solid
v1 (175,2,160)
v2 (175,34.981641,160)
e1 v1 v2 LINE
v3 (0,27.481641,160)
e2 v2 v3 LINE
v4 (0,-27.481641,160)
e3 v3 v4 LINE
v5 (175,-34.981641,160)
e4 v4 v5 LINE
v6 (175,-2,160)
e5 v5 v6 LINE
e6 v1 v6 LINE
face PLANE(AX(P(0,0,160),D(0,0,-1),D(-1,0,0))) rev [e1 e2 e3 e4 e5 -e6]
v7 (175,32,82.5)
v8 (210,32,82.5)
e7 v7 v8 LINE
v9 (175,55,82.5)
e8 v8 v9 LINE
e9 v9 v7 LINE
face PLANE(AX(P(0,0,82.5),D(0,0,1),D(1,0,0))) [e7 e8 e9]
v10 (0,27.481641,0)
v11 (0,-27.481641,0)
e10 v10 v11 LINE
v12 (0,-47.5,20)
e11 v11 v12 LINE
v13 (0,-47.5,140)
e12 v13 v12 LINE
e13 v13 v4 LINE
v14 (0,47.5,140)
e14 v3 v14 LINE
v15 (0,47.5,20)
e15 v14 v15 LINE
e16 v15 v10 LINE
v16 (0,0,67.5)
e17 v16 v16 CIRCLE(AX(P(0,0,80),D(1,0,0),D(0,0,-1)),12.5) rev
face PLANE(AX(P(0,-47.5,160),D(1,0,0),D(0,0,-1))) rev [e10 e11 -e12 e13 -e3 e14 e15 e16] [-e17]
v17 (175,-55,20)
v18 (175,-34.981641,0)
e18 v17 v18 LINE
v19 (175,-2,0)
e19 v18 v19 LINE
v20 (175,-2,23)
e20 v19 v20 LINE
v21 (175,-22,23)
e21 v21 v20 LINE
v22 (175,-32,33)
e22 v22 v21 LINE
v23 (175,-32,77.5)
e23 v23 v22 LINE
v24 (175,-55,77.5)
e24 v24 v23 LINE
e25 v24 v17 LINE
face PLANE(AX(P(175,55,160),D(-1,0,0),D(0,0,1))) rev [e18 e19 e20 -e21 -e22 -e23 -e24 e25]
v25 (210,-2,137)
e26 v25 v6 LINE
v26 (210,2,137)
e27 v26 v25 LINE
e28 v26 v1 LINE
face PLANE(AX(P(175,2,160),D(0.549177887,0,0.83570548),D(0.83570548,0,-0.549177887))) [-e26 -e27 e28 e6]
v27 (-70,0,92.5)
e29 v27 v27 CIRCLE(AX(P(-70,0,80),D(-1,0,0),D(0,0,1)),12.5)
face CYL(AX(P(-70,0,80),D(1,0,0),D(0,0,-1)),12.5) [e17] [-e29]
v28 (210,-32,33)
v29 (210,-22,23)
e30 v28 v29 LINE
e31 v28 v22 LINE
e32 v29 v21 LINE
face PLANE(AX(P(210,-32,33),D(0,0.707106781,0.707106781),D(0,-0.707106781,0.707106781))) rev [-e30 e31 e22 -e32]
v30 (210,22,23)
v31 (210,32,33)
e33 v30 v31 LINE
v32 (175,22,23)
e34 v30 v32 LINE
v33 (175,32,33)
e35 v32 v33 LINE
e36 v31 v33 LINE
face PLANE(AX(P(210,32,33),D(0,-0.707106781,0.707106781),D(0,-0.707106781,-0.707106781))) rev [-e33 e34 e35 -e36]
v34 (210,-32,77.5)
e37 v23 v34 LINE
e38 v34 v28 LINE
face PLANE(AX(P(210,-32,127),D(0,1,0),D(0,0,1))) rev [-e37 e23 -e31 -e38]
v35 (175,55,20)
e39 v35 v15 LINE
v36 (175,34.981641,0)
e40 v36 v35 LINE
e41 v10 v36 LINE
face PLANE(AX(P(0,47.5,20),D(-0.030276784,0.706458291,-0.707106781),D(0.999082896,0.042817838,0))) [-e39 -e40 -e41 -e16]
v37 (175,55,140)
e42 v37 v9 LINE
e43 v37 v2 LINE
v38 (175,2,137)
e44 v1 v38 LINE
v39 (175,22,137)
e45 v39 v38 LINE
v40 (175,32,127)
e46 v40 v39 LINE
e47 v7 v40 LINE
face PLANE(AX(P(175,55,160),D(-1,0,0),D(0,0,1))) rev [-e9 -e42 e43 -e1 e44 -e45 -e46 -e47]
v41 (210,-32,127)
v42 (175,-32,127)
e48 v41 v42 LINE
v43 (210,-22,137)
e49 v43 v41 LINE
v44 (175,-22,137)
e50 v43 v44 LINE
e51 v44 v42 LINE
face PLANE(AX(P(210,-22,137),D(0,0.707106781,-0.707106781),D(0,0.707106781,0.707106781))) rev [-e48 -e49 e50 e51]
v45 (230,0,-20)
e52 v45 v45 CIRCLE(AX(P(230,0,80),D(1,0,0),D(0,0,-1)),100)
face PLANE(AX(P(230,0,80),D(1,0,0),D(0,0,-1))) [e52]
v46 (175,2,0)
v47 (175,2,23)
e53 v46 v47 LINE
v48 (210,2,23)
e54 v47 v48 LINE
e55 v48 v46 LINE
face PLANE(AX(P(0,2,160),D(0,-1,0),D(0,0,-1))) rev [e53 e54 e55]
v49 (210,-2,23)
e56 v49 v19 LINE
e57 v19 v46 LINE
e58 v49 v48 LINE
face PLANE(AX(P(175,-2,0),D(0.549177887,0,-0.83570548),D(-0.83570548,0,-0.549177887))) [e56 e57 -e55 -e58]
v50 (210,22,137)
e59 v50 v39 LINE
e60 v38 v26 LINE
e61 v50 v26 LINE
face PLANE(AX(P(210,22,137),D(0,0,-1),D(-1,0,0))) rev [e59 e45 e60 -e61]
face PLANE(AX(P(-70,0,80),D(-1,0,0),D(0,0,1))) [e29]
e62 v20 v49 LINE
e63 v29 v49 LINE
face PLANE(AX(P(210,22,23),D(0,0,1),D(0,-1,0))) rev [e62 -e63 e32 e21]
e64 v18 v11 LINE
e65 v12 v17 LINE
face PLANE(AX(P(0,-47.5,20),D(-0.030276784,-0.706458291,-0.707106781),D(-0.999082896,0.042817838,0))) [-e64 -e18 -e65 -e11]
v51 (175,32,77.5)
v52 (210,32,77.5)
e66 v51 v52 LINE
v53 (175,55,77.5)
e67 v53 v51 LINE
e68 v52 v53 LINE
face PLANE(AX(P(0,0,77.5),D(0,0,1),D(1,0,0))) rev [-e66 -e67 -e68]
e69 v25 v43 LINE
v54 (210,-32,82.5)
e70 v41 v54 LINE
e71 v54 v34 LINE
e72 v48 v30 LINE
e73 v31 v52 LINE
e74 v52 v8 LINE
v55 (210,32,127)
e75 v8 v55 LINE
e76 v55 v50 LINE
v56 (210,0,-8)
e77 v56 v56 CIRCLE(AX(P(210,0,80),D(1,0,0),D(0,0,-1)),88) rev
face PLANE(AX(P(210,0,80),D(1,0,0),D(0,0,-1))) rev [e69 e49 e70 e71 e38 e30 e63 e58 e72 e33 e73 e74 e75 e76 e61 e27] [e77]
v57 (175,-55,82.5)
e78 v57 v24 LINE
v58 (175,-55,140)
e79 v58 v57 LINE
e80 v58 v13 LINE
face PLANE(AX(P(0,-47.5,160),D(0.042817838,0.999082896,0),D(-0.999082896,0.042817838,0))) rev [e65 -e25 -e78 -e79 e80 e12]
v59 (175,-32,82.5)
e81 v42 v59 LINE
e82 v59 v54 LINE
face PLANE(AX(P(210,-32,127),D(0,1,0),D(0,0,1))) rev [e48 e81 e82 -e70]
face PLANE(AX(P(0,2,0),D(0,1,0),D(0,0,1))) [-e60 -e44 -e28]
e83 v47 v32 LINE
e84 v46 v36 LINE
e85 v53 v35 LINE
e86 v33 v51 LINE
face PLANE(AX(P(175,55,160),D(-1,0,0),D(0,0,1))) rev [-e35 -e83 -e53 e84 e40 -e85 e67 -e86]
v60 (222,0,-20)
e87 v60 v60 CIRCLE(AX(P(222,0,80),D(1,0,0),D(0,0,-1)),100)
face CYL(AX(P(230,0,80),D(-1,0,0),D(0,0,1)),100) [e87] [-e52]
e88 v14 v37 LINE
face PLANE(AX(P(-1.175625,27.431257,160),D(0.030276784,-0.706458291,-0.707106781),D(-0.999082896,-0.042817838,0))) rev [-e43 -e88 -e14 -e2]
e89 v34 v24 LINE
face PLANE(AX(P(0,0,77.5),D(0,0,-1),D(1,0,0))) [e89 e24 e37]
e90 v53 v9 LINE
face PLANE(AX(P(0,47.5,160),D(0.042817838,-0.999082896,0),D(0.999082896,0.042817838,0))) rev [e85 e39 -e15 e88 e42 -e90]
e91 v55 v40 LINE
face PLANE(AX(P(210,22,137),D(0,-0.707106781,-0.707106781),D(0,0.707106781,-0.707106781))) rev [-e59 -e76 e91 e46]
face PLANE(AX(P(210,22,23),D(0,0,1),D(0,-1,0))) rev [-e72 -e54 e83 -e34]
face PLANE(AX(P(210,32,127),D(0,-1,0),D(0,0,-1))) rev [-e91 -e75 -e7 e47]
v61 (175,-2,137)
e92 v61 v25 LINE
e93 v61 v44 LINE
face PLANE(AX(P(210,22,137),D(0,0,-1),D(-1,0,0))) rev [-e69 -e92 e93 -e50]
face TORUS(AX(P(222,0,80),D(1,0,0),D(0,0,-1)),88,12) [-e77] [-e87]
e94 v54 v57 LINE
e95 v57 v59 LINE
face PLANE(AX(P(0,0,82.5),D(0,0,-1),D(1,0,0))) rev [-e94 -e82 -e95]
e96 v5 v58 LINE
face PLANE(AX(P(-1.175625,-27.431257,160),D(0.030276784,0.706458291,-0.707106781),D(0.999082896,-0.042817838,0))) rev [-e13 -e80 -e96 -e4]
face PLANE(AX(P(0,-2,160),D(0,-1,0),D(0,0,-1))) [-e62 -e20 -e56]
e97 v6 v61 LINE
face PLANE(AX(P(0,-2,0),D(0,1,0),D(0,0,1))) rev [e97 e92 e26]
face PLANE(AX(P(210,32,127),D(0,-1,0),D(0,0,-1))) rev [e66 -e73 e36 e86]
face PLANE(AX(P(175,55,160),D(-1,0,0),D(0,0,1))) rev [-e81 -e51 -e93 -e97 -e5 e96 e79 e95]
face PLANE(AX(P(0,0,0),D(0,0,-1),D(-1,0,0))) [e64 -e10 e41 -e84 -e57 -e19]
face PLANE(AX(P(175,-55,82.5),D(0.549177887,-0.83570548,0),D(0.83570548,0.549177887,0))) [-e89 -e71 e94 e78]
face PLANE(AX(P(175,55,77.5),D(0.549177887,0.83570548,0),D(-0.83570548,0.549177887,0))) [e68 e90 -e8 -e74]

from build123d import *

# Parameters (mm, degrees)
BOSS_EXTRU_1_DEPTH           = 160
ESQUISSE3_R                  = 12.5
BOSS_EXTRU_3_DEPTH           = 70
CHANFREIN9_SIZE              = 20
BOSS_EXTRU_4_DEPTH           = 35
BOSS_EXTRU_5_DEPTH           = 2.5
R_P_TITION_START             = 77.5
R_P_TITION_CIRCULAIRE1_DEPTH = 5
BOSS_EXTRU_6_START           = -32
BOSS_EXTRU_6_DEPTH           = 2
R_P_TITION_START_2           = -2
R_P_TITION_CIRCULAIRE2_DEPTH = 4
ESQUISSE10_R                 = 100
BOSS_EXTRU_7_DEPTH           = 20
CONG_3_R                     = 12


# Read off the part's stored shape, not the designer's step: Répétition circulaire1, Répétition circulaire2
with BuildPart() as part:
    # Esquisse1 → Boss.-Extru.1 (new body)
    with BuildSketch(Plane.XY):
        Polygon((0, -47.5), (0, 47.5), (175, 55), (175, -55), align=None)
    extrude(amount=BOSS_EXTRU_1_DEPTH)

    # Esquisse3 → Boss.-Extru.3 (add)
    with BuildSketch(Plane.ZY):
        with Locations(Location((80, 0, 0), (0, 0, 180))):
            Circle(ESQUISSE3_R)
    extrude(amount=BOSS_EXTRU_3_DEPTH)

    # Chanfrein9
    chanfrein9_edges = [part.edges().sort_by_distance(p)[0] for p in [
        (87.5, -51.25, 160),
        (87.5, 51.25, 160),
        (87.5, -51.25, 0),
        (87.5, 51.25, 0),
    ]]
    chamfer(chanfrein9_edges, length=CHANFREIN9_SIZE)

    # Esquisse4 → Boss.-Extru.4 (add)
    with BuildSketch(Plane(origin=(175, 0, 0), x_dir=(0, 0, -1), z_dir=(1, 0, 0))):
        Polygon((-127, 32), (-33, 32), (-23, 22), (-23, -22), (-33, -32), (-127, -32), (-137, -22), (-137, 22), align=None)
    extrude(amount=BOSS_EXTRU_4_DEPTH)

    # Esquisse5 → Boss.-Extru.5 (add, symmetric)
    with BuildSketch(Plane.XY.offset(80)):
        Polygon((175, 55), (210, 32), (175, 32), align=None)
    extrude(amount=BOSS_EXTRU_5_DEPTH, both=True)

    # Répétition circulaire1 outline → Répétition circulaire1 (add)
    with BuildSketch(Plane.XY.offset(R_P_TITION_START)):
        Polygon((175, -32), (175, -55), (210, -32), align=None)
    extrude(amount=R_P_TITION_CIRCULAIRE1_DEPTH)

    # Esquisse8 → Boss.-Extru.6 (add, symmetric)
    with BuildSketch(Plane.XZ.offset(32).offset(BOSS_EXTRU_6_START)):
        Polygon((175, 160), (210, 137), (175, 137), align=None)
    extrude(amount=BOSS_EXTRU_6_DEPTH, both=True)

    # Répétition circulaire2 outline → Répétition circulaire2 (add)
    with BuildSketch(Plane(origin=(0, 0, 0), x_dir=(1, 0, 0), z_dir=(0, 1, 0)).offset(R_P_TITION_START_2)):
        Polygon((175, -23), (210, -23), (175, 0), align=None)
    extrude(amount=R_P_TITION_CIRCULAIRE2_DEPTH)

    # Esquisse10 → Boss.-Extru.7 (add)
    with BuildSketch(Plane(origin=(210, 0, 0), x_dir=(0, 0, -1), z_dir=(1, 0, 0))):
        with Locations((-80, 0)):
            Circle(ESQUISSE10_R)
    extrude(amount=BOSS_EXTRU_7_DEPTH)

    # Congé3
    cong_3_edges = [part.edges().sort_by_distance(p)[0] for p in [
        (210, 0, 180),
    ]]
    fillet(cong_3_edges, radius=CONG_3_R)


solid = part.part
